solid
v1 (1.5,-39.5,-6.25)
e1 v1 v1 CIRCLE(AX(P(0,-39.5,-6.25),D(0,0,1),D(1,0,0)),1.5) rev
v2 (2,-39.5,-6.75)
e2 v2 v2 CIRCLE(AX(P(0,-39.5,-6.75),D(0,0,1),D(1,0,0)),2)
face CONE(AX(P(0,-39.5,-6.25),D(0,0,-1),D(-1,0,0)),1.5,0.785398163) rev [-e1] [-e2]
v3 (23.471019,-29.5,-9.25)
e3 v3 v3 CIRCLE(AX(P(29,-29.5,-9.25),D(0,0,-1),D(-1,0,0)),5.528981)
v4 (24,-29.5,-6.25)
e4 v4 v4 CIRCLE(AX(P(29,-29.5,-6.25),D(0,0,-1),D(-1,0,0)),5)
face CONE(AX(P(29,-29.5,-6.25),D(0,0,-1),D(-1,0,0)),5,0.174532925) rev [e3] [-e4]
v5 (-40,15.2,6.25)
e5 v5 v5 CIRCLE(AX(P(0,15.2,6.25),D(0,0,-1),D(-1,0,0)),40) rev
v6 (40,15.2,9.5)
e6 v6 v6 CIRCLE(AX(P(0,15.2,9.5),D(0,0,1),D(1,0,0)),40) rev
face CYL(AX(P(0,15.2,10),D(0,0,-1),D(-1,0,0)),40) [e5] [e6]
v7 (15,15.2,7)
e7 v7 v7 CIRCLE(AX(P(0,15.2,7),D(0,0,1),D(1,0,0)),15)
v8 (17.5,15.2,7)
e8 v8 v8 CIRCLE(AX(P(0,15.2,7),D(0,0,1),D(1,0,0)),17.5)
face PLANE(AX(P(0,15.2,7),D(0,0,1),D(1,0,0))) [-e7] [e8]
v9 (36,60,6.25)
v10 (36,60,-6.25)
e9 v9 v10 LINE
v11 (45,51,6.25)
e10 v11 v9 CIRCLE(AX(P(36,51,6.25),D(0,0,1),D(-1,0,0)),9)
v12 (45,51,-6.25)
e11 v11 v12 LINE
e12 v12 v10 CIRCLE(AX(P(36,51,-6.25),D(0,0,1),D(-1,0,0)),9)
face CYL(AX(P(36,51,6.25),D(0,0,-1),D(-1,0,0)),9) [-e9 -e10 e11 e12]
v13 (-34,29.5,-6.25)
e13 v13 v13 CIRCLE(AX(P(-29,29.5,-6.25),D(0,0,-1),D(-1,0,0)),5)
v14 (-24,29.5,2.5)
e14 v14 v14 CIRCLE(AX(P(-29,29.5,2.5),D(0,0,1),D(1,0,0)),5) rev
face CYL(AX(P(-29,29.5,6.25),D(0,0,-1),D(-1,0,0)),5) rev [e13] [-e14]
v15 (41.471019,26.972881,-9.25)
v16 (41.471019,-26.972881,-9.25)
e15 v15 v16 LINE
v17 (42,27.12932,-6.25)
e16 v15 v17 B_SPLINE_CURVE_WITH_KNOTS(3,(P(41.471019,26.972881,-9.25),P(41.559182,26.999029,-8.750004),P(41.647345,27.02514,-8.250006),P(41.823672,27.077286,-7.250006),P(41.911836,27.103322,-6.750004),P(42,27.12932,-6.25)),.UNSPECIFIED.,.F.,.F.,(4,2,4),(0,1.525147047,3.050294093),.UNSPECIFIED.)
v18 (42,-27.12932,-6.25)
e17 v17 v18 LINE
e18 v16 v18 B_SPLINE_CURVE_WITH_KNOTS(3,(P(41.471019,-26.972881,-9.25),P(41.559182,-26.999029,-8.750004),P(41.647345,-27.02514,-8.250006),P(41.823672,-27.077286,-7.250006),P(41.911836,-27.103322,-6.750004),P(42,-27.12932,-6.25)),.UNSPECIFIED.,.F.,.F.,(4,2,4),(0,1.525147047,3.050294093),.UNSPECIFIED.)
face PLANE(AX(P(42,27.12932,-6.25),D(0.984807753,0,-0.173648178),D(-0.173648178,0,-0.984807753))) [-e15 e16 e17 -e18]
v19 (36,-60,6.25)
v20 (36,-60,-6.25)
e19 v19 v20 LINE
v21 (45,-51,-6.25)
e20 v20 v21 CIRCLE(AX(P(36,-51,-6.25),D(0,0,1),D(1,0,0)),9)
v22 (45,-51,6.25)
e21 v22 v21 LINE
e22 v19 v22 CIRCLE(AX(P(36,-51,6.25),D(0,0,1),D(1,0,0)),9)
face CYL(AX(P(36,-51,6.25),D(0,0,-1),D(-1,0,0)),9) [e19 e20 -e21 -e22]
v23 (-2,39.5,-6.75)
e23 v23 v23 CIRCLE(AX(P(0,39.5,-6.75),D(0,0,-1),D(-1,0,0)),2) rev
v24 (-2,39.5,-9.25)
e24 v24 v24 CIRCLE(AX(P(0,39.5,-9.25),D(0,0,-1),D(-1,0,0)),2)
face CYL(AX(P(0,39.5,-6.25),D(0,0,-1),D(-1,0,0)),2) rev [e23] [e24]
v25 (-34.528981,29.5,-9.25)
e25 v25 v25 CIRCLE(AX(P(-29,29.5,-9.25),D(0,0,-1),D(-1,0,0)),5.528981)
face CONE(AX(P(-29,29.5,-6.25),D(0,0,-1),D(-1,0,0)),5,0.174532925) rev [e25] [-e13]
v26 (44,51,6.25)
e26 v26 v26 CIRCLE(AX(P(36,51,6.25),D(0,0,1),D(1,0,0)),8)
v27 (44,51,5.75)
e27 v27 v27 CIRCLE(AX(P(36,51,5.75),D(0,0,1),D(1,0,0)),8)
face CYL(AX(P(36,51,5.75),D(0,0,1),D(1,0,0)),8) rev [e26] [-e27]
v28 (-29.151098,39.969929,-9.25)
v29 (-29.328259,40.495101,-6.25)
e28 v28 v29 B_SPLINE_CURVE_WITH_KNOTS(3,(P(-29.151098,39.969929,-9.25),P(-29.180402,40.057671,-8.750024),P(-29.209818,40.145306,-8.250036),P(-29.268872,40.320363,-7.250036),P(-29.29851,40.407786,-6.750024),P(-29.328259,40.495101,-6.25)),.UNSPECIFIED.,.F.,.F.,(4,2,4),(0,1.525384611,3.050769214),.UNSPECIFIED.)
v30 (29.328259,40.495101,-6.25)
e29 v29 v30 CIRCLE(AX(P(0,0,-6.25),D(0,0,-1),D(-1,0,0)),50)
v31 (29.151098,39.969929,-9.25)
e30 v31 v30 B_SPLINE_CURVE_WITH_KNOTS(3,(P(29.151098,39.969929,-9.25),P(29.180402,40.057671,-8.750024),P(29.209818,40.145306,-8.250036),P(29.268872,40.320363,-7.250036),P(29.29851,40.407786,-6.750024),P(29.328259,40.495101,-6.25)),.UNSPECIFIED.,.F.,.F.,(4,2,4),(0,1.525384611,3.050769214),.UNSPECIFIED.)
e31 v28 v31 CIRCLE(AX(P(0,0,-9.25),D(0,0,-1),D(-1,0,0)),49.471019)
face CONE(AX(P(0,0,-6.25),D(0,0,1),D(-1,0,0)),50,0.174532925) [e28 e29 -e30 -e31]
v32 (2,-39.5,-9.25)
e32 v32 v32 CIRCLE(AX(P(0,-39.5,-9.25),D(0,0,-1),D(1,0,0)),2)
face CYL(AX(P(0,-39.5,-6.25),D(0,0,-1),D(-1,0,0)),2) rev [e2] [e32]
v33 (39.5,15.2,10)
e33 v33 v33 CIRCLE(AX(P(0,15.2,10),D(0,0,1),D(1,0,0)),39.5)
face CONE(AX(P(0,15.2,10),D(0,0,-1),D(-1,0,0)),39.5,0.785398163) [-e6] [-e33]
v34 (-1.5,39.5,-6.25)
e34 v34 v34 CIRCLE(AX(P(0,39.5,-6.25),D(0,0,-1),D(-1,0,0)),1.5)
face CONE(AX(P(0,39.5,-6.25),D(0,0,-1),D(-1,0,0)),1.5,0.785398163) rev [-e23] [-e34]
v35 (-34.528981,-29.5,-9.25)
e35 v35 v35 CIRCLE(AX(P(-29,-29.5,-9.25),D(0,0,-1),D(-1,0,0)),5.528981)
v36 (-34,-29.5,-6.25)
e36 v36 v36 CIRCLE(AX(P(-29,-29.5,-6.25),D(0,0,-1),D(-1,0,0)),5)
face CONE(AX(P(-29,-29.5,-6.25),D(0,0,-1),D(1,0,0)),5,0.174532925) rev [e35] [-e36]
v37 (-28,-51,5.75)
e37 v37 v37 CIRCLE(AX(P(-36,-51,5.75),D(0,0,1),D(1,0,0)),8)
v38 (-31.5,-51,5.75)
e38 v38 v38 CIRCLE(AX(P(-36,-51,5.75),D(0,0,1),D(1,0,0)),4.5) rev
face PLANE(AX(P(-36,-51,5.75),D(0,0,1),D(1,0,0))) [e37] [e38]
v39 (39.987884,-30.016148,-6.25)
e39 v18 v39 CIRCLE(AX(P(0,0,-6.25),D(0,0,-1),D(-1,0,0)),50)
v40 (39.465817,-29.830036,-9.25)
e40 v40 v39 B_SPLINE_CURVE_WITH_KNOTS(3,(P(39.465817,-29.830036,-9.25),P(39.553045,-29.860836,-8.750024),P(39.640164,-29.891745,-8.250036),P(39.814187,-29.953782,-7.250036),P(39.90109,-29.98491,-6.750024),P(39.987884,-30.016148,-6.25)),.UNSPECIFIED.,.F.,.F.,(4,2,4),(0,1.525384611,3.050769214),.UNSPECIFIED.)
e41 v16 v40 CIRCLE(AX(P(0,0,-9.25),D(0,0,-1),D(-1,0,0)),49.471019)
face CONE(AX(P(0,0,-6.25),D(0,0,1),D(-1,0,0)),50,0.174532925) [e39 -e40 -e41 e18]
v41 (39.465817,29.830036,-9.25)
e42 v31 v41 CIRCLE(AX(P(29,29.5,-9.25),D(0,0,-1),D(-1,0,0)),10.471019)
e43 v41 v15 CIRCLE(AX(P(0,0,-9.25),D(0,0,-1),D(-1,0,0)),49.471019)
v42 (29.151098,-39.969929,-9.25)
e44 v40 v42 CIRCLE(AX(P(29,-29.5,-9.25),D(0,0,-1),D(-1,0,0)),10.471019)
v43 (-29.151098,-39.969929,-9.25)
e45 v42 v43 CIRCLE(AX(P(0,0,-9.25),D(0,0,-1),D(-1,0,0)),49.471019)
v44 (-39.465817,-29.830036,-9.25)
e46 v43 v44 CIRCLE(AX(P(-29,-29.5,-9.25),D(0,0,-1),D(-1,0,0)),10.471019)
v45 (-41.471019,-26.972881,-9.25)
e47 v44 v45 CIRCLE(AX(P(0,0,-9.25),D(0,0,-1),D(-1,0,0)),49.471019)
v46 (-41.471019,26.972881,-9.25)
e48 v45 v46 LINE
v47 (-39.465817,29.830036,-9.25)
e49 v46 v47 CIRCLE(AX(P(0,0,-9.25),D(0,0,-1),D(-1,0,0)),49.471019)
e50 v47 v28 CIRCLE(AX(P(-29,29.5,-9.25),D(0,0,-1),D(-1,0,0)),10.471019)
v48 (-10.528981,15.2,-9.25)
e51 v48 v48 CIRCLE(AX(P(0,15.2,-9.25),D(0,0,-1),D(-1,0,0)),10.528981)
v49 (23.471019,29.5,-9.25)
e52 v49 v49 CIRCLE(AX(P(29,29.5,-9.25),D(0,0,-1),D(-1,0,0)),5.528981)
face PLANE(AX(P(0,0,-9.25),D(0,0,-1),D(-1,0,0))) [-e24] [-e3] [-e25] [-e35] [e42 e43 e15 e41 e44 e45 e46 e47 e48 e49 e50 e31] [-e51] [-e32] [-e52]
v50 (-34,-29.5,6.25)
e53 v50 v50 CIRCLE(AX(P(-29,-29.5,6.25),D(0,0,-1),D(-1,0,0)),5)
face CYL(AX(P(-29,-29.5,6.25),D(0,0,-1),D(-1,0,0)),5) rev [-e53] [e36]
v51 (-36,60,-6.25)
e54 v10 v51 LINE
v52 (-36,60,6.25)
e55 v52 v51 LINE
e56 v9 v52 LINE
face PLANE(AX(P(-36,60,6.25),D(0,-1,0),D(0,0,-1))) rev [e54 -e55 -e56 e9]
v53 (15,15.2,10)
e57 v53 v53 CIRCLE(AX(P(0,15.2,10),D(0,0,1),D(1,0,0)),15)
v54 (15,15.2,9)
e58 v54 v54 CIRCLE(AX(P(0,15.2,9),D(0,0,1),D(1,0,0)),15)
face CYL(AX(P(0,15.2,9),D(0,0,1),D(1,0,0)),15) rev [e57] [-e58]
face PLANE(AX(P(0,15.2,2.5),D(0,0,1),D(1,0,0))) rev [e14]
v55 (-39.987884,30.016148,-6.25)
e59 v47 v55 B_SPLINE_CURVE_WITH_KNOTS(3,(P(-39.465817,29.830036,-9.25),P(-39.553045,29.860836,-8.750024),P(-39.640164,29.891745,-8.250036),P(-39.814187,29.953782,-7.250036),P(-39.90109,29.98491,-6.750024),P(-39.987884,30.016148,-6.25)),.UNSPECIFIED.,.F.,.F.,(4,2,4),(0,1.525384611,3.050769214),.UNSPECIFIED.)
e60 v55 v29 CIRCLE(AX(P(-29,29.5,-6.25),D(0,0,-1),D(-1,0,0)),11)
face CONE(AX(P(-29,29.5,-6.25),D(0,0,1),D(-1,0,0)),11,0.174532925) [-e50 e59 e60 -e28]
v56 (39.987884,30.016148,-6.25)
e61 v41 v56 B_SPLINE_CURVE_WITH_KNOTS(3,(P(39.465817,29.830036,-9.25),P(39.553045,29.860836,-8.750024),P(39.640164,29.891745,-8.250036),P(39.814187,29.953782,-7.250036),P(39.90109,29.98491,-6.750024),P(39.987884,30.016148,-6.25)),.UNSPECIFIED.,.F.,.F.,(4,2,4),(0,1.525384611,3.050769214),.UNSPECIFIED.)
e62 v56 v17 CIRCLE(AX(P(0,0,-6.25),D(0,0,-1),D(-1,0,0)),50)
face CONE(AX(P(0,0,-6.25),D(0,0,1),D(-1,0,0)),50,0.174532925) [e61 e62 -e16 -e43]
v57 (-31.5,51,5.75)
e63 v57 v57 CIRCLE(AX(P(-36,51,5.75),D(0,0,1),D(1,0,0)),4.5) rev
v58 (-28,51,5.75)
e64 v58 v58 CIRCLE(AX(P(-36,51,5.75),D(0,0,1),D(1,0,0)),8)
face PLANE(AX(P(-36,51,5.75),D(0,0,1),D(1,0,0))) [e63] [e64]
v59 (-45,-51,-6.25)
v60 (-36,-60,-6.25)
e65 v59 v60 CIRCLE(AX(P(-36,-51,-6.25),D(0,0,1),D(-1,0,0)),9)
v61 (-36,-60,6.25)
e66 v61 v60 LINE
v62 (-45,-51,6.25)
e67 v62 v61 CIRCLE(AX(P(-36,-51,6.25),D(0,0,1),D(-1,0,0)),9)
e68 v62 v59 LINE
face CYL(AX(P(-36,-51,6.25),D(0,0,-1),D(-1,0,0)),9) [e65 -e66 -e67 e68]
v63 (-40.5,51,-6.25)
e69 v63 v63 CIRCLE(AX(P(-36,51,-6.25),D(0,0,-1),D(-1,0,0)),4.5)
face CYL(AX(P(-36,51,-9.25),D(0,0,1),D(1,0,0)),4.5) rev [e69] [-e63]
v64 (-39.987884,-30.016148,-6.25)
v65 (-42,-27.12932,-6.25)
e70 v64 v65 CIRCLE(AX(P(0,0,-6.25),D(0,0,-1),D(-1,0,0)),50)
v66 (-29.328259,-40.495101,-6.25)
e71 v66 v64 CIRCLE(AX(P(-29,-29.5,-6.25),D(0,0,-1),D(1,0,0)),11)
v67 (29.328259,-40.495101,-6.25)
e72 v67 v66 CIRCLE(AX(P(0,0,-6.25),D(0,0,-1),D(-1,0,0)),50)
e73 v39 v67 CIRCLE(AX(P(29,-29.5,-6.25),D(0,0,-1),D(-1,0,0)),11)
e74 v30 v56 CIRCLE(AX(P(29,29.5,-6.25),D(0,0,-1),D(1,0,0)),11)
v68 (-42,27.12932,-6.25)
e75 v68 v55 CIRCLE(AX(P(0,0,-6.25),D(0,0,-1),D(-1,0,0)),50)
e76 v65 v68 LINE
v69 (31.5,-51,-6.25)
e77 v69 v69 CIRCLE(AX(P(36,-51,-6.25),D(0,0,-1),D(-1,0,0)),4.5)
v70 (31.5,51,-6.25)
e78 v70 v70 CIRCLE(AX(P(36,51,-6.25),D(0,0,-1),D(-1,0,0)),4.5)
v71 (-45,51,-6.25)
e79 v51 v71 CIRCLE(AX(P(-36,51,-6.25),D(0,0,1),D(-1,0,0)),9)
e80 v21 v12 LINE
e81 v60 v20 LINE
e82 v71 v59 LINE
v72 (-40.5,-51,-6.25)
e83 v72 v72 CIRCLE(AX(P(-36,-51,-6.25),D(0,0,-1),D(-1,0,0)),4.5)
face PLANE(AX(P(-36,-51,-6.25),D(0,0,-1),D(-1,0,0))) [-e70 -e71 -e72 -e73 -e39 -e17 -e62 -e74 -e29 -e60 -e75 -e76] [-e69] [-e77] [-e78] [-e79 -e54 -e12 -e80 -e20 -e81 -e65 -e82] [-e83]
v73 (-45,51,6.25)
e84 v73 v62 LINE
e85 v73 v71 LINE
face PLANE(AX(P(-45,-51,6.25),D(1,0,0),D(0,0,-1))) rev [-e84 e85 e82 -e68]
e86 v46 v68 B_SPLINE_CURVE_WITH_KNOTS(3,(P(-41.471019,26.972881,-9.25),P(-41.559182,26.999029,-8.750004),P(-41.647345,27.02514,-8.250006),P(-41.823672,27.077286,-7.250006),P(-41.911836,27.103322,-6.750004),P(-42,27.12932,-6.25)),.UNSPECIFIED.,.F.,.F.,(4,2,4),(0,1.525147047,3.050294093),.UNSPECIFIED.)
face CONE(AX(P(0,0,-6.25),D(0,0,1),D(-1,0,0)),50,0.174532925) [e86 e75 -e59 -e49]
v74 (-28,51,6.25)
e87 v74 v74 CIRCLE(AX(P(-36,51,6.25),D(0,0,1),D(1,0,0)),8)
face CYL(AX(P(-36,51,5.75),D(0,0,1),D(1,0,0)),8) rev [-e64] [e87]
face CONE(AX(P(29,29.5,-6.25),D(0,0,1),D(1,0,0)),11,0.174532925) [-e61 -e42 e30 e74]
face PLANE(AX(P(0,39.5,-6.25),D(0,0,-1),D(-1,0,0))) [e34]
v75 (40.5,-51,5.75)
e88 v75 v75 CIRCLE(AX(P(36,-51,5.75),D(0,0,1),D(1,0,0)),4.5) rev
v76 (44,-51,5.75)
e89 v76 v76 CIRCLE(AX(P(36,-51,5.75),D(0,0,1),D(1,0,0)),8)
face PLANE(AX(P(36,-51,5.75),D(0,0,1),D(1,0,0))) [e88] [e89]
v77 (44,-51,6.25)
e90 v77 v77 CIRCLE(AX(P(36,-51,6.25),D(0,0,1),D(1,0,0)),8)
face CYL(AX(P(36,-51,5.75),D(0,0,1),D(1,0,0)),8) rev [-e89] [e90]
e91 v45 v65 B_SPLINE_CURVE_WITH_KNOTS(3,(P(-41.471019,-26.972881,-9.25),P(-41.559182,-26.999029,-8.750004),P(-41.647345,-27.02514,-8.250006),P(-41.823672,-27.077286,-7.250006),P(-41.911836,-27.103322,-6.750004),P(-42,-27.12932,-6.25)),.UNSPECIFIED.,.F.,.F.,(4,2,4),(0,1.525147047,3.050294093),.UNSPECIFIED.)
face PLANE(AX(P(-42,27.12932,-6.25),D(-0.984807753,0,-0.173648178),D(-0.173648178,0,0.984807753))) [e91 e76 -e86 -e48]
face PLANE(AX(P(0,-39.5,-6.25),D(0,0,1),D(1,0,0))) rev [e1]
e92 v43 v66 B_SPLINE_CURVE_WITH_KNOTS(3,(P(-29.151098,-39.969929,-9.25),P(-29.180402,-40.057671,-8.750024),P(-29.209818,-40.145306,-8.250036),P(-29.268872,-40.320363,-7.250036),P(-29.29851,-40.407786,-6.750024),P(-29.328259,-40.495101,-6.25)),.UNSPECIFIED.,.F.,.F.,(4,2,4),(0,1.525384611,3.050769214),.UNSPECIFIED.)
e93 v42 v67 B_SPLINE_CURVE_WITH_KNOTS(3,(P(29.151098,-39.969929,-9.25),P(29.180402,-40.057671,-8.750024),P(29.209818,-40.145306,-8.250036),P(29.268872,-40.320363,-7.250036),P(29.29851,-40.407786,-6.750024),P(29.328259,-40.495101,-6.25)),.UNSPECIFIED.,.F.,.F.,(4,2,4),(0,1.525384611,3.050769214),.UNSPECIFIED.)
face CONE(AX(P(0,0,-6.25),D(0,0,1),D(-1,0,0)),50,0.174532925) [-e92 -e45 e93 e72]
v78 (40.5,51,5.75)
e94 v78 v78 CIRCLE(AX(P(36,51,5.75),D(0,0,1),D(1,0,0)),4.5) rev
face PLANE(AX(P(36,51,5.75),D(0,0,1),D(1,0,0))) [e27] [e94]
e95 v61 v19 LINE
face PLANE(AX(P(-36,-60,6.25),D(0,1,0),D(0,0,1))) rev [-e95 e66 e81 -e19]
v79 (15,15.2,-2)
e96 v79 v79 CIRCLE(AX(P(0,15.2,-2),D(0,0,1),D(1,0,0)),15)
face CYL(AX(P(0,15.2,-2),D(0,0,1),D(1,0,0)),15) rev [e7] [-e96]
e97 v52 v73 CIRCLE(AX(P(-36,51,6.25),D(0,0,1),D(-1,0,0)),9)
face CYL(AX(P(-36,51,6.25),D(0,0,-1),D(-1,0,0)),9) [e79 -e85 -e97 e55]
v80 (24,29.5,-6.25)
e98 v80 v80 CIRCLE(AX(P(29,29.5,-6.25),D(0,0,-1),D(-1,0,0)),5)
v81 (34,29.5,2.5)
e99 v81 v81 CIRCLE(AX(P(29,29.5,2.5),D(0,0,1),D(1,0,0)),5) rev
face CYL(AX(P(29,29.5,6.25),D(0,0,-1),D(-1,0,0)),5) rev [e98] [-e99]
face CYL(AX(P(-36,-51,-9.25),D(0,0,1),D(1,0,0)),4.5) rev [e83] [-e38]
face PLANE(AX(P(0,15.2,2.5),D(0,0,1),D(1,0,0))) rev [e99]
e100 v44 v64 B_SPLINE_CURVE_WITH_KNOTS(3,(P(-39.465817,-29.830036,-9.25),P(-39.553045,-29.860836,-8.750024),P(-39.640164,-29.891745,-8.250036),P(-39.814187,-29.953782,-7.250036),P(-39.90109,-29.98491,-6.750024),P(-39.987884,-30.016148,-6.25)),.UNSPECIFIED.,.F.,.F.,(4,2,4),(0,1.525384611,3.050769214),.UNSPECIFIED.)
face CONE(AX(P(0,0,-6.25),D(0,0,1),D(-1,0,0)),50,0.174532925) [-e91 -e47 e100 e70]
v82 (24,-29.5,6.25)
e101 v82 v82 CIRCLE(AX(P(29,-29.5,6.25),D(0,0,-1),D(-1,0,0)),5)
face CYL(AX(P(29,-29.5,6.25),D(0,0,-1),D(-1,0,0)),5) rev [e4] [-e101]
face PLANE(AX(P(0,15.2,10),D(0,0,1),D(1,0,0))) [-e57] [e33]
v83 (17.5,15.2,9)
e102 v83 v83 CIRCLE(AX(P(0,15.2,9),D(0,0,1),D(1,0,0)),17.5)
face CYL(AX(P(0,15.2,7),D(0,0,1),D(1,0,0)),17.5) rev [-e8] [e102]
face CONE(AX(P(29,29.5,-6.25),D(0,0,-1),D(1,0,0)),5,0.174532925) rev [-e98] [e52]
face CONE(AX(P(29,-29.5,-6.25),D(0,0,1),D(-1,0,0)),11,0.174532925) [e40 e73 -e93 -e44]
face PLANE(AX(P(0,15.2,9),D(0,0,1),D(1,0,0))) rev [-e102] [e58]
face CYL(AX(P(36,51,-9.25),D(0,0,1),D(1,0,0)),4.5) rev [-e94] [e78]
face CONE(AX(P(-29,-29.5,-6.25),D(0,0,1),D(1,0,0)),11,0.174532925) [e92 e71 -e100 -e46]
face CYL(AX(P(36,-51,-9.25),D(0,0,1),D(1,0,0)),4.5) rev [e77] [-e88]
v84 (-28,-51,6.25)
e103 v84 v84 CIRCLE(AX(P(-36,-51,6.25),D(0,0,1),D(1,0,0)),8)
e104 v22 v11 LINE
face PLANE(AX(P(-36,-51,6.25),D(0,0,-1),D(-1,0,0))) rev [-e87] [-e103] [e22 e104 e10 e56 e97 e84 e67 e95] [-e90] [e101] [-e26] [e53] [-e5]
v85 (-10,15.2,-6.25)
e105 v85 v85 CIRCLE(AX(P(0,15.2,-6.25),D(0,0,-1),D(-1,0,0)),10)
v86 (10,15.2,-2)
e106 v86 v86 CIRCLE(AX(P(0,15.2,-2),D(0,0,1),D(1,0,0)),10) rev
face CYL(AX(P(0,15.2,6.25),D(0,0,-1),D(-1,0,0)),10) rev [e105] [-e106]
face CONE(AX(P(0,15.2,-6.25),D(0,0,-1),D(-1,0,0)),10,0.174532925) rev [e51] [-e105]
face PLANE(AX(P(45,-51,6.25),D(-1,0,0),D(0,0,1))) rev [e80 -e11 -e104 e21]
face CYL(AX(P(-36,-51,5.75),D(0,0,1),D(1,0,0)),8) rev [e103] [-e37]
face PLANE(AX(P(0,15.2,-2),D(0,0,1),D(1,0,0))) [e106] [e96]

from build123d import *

# Parameters (mm, degrees)
BOSS_EXTRUDE1_DEPTH = 6.25
SKETCH2_R           = 10
SKETCH2_R_2         = 5
BOSS_EXTRUDE2_DEPTH = 3
BOSS_EXTRUDE2_DRAFT = 10
SKETCH3_R           = 5
SKETCH3_R_2         = 10
CUT_EXTRUDE1_DEPTH  = 77.034531629
SKETCH5_R           = 40
BOSS_EXTRUDE3_DEPTH = 3.75
SKETCH6_R           = 15
CUT_EXTRUDE2_DEPTH  = 1
SKETCH7_R           = 17.5
CUT_EXTRUDE3_DEPTH  = 2
SKETCH8_R           = 15
CUT_EXTRUDE4_DEPTH  = 9
SKETCH11_R          = 4.5
CUT_EXTRUDE5_DEPTH  = 77.584920187
SKETCH13_R          = 8
CUT_EXTRUDE6_DEPTH  = 0.5
CHAMFER1_SIZE       = 0.5
SKETCH14_R          = 2
CUT_EXTRUDE8_DEPTH  = 3
CHAMFER2_SIZE       = 0.5


with BuildPart() as part:
    # Sketch1 → Boss-Extrude1 (new, symmetric)
    with BuildSketch(Plane.XY):
        with BuildLine():
            Line((-36, -60), (36, -60))
            ThreePointArc((36, -60), (42.363961031, -57.363961031), (45, -51))
            Line((45, -51), (45, 51))
            ThreePointArc((45, 51), (42.363961031, 57.363961031), (36, 60))
            Line((36, 60), (-36, 60))
            ThreePointArc((-36, 60), (-42.363961031, 57.363961031), (-45, 51))
            Line((-45, 51), (-45, -51))
            ThreePointArc((-45, -51), (-42.363961031, -57.363961031), (-36, -60))
        make_face()
    extrude(amount=BOSS_EXTRUDE1_DEPTH, both=True)


with BuildPart() as boss_extrude2_tool:
    # Sketch2 → Boss-Extrude2 (with draft: the straight prism first)
    with BuildSketch(Plane(origin=(0, 0, -6.25), x_dir=(-1, 0, 0), z_dir=(0, 0, -1))):
        with BuildLine():
            ThreePointArc((42, 27.129319933), (41.019345657, 28.590440394), (39.987883834, 30.016148096))
            ThreePointArc((39.987883834, 30.016148096), (36.711412809, 37.344368202), (29.328259336, 40.495100991))
            ThreePointArc((29.328259336, 40.495100991), (0, 50), (-29.328259336, 40.495100991))
            ThreePointArc((-29.328259336, 40.495100991), (-36.711412809, 37.344368202), (-39.987883834, 30.016148096))
            ThreePointArc((-39.987883834, 30.016148096), (-41.019345657, 28.590440394), (-42, 27.129319933))
            Line((-42, 27.129319933), (-42, -27.129319933))
            ThreePointArc((-42, -27.129319933), (-41.019345657, -28.590440394), (-39.987883834, -30.016148096))
            ThreePointArc((-39.987883834, -30.016148096), (-36.711412809, -37.344368202), (-29.328259336, -40.495100991))
            ThreePointArc((-29.328259336, -40.495100991), (0, -50), (29.328259336, -40.495100991))
            ThreePointArc((29.328259336, -40.495100991), (36.711412809, -37.344368202), (39.987883834, -30.016148096))
            ThreePointArc((39.987883834, -30.016148096), (41.019345657, -28.590440394), (42, -27.129319933))
            Line((42, -27.129319933), (42, 27.129319933))
        make_face()
        with Locations((0, 15.2)):
            Circle(SKETCH2_R, mode=Mode.SUBTRACT)
        with Locations((29, 29.5)):
            Circle(SKETCH2_R_2, mode=Mode.SUBTRACT)
        with Locations((29, -29.5)):
            Circle(SKETCH2_R_2, mode=Mode.SUBTRACT)
        with Locations((-29, -29.5)):
            Circle(SKETCH2_R_2, mode=Mode.SUBTRACT)
        with Locations((-29, 29.5)):
            Circle(SKETCH2_R_2, mode=Mode.SUBTRACT)
    extrude(amount=BOSS_EXTRUDE2_DEPTH)
    # Boss-Extrude2: the draft: its side faces are tilted about the plane it starts from
    boss_extrude2_sides = [boss_extrude2_tool.faces().sort_by_distance(p)[0] for p in [
        (0, -50, -7.75),
        (-36.711412809, -37.344368202, -7.75),
        (-41.019345657, -28.590440394, -7.75),
        (-42, 0, -7.75),
        (-41.019345657, 28.590440394, -7.75),
        (-36.711412809, 37.344368202, -7.75),
        (0, 50, -7.75),
        (36.711412809, 37.344368202, -7.75),
        (41.019345657, 28.590440394, -7.75),
        (42, 0, -7.75),
        (41.019345657, -28.590440394, -7.75),
        (36.711412809, -37.344368202, -7.75),
        (10, 15.2, -7.75),
        (-24, 29.5, -7.75),
        (-24, -29.5, -7.75),
        (34, -29.5, -7.75),
        (34, 29.5, -7.75),
    ]]
    draft(boss_extrude2_sides, Plane(origin=(0, 0, -6.25), x_dir=(-1, 0, 0), z_dir=(0, 0, -1)), BOSS_EXTRUDE2_DRAFT)


with BuildPart() as part_1:
    add(part.part)

    # Boss-Extrude2: add boss_extrude2_tool
    add(boss_extrude2_tool.part)

    # Sketch3 → Cut-Extrude1 (cut, through all)
    with BuildSketch(Plane(origin=(0, 0, -6.25), x_dir=(-1, 0, 0), z_dir=(0, 0, -1))):
        with Locations((29, -29.5)):
            Circle(SKETCH3_R)
        with Locations((-29, -29.5)):
            Circle(SKETCH3_R)
        with Locations((29, 29.5)):
            Circle(SKETCH3_R)
        with Locations((-29, 29.5)):
            Circle(SKETCH3_R)
        with Locations((0, 15.2)):
            Circle(SKETCH3_R_2)
    extrude(amount=-CUT_EXTRUDE1_DEPTH, mode=Mode.SUBTRACT)

    # Sketch5 → Boss-Extrude3 (add, symmetric)
    with BuildSketch(Plane.XY.offset(6.25)):
        with Locations((0, 15.2)):
            Circle(SKETCH5_R)
    extrude(amount=BOSS_EXTRUDE3_DEPTH, both=True)

    # Sketch6 → Cut-Extrude2 (cut)
    with BuildSketch(Plane.XY.offset(10)):
        with Locations((0, 15.2)):
            Circle(SKETCH6_R)
    extrude(amount=-CUT_EXTRUDE2_DEPTH, mode=Mode.SUBTRACT)

    # Sketch7 → Cut-Extrude3 (cut)
    with BuildSketch(Plane.XY.offset(9)):
        with Locations((0, 15.2)):
            Circle(SKETCH7_R)
    extrude(amount=-CUT_EXTRUDE3_DEPTH, mode=Mode.SUBTRACT)

    # Sketch8 → Cut-Extrude4 (cut)
    with BuildSketch(Plane.XY.offset(7)):
        with Locations((0, 15.2)):
            Circle(SKETCH8_R)
    extrude(amount=-CUT_EXTRUDE4_DEPTH, mode=Mode.SUBTRACT)

    # Sketch11 → Cut-Extrude5 (cut, through all)
    with BuildSketch(Plane.XY.offset(6.25)):
        with Locations((36, 51)):
            Circle(SKETCH11_R)
        with Locations((-36, 51)):
            Circle(SKETCH11_R)
        with Locations((36, -51)):
            Circle(SKETCH11_R)
        with Locations((-36, -51)):
            Circle(SKETCH11_R)
    extrude(amount=-CUT_EXTRUDE5_DEPTH, mode=Mode.SUBTRACT)

    # Sketch13 → Cut-Extrude6 (cut)
    with BuildSketch(Plane.XY.offset(6.25)):
        with Locations((36, 51)):
            Circle(SKETCH13_R)
        with Locations((-36, 51)):
            Circle(SKETCH13_R)
        with Locations((-36, -51)):
            Circle(SKETCH13_R)
        with Locations((36, -51)):
            Circle(SKETCH13_R)
    extrude(amount=-CUT_EXTRUDE6_DEPTH, mode=Mode.SUBTRACT)

    # Chamfer1
    chamfer1_edges = [part_1.edges().sort_by_distance(p)[0] for p in [
        (-40, 15.2, 10),
    ]]
    chamfer(chamfer1_edges, length=CHAMFER1_SIZE)

    # Sketch14 → Cut-Extrude8 (cut)
    with BuildSketch(Plane(origin=(0, 0, -9.25), x_dir=(-1, 0, 0), z_dir=(0, 0, -1))):
        with Locations((0, 39.5)):
            Circle(SKETCH14_R)
        with Locations((0, -39.5)):
            Circle(SKETCH14_R)
    extrude(amount=-CUT_EXTRUDE8_DEPTH, mode=Mode.SUBTRACT)

    # Chamfer2
    chamfer2_edges = [part_1.edges().sort_by_distance(p)[0] for p in [
        (2, -39.5, -6.25),
        (2, 39.5, -6.25),
    ]]
    chamfer(chamfer2_edges, length=CHAMFER2_SIZE)


solid = part_1.part
